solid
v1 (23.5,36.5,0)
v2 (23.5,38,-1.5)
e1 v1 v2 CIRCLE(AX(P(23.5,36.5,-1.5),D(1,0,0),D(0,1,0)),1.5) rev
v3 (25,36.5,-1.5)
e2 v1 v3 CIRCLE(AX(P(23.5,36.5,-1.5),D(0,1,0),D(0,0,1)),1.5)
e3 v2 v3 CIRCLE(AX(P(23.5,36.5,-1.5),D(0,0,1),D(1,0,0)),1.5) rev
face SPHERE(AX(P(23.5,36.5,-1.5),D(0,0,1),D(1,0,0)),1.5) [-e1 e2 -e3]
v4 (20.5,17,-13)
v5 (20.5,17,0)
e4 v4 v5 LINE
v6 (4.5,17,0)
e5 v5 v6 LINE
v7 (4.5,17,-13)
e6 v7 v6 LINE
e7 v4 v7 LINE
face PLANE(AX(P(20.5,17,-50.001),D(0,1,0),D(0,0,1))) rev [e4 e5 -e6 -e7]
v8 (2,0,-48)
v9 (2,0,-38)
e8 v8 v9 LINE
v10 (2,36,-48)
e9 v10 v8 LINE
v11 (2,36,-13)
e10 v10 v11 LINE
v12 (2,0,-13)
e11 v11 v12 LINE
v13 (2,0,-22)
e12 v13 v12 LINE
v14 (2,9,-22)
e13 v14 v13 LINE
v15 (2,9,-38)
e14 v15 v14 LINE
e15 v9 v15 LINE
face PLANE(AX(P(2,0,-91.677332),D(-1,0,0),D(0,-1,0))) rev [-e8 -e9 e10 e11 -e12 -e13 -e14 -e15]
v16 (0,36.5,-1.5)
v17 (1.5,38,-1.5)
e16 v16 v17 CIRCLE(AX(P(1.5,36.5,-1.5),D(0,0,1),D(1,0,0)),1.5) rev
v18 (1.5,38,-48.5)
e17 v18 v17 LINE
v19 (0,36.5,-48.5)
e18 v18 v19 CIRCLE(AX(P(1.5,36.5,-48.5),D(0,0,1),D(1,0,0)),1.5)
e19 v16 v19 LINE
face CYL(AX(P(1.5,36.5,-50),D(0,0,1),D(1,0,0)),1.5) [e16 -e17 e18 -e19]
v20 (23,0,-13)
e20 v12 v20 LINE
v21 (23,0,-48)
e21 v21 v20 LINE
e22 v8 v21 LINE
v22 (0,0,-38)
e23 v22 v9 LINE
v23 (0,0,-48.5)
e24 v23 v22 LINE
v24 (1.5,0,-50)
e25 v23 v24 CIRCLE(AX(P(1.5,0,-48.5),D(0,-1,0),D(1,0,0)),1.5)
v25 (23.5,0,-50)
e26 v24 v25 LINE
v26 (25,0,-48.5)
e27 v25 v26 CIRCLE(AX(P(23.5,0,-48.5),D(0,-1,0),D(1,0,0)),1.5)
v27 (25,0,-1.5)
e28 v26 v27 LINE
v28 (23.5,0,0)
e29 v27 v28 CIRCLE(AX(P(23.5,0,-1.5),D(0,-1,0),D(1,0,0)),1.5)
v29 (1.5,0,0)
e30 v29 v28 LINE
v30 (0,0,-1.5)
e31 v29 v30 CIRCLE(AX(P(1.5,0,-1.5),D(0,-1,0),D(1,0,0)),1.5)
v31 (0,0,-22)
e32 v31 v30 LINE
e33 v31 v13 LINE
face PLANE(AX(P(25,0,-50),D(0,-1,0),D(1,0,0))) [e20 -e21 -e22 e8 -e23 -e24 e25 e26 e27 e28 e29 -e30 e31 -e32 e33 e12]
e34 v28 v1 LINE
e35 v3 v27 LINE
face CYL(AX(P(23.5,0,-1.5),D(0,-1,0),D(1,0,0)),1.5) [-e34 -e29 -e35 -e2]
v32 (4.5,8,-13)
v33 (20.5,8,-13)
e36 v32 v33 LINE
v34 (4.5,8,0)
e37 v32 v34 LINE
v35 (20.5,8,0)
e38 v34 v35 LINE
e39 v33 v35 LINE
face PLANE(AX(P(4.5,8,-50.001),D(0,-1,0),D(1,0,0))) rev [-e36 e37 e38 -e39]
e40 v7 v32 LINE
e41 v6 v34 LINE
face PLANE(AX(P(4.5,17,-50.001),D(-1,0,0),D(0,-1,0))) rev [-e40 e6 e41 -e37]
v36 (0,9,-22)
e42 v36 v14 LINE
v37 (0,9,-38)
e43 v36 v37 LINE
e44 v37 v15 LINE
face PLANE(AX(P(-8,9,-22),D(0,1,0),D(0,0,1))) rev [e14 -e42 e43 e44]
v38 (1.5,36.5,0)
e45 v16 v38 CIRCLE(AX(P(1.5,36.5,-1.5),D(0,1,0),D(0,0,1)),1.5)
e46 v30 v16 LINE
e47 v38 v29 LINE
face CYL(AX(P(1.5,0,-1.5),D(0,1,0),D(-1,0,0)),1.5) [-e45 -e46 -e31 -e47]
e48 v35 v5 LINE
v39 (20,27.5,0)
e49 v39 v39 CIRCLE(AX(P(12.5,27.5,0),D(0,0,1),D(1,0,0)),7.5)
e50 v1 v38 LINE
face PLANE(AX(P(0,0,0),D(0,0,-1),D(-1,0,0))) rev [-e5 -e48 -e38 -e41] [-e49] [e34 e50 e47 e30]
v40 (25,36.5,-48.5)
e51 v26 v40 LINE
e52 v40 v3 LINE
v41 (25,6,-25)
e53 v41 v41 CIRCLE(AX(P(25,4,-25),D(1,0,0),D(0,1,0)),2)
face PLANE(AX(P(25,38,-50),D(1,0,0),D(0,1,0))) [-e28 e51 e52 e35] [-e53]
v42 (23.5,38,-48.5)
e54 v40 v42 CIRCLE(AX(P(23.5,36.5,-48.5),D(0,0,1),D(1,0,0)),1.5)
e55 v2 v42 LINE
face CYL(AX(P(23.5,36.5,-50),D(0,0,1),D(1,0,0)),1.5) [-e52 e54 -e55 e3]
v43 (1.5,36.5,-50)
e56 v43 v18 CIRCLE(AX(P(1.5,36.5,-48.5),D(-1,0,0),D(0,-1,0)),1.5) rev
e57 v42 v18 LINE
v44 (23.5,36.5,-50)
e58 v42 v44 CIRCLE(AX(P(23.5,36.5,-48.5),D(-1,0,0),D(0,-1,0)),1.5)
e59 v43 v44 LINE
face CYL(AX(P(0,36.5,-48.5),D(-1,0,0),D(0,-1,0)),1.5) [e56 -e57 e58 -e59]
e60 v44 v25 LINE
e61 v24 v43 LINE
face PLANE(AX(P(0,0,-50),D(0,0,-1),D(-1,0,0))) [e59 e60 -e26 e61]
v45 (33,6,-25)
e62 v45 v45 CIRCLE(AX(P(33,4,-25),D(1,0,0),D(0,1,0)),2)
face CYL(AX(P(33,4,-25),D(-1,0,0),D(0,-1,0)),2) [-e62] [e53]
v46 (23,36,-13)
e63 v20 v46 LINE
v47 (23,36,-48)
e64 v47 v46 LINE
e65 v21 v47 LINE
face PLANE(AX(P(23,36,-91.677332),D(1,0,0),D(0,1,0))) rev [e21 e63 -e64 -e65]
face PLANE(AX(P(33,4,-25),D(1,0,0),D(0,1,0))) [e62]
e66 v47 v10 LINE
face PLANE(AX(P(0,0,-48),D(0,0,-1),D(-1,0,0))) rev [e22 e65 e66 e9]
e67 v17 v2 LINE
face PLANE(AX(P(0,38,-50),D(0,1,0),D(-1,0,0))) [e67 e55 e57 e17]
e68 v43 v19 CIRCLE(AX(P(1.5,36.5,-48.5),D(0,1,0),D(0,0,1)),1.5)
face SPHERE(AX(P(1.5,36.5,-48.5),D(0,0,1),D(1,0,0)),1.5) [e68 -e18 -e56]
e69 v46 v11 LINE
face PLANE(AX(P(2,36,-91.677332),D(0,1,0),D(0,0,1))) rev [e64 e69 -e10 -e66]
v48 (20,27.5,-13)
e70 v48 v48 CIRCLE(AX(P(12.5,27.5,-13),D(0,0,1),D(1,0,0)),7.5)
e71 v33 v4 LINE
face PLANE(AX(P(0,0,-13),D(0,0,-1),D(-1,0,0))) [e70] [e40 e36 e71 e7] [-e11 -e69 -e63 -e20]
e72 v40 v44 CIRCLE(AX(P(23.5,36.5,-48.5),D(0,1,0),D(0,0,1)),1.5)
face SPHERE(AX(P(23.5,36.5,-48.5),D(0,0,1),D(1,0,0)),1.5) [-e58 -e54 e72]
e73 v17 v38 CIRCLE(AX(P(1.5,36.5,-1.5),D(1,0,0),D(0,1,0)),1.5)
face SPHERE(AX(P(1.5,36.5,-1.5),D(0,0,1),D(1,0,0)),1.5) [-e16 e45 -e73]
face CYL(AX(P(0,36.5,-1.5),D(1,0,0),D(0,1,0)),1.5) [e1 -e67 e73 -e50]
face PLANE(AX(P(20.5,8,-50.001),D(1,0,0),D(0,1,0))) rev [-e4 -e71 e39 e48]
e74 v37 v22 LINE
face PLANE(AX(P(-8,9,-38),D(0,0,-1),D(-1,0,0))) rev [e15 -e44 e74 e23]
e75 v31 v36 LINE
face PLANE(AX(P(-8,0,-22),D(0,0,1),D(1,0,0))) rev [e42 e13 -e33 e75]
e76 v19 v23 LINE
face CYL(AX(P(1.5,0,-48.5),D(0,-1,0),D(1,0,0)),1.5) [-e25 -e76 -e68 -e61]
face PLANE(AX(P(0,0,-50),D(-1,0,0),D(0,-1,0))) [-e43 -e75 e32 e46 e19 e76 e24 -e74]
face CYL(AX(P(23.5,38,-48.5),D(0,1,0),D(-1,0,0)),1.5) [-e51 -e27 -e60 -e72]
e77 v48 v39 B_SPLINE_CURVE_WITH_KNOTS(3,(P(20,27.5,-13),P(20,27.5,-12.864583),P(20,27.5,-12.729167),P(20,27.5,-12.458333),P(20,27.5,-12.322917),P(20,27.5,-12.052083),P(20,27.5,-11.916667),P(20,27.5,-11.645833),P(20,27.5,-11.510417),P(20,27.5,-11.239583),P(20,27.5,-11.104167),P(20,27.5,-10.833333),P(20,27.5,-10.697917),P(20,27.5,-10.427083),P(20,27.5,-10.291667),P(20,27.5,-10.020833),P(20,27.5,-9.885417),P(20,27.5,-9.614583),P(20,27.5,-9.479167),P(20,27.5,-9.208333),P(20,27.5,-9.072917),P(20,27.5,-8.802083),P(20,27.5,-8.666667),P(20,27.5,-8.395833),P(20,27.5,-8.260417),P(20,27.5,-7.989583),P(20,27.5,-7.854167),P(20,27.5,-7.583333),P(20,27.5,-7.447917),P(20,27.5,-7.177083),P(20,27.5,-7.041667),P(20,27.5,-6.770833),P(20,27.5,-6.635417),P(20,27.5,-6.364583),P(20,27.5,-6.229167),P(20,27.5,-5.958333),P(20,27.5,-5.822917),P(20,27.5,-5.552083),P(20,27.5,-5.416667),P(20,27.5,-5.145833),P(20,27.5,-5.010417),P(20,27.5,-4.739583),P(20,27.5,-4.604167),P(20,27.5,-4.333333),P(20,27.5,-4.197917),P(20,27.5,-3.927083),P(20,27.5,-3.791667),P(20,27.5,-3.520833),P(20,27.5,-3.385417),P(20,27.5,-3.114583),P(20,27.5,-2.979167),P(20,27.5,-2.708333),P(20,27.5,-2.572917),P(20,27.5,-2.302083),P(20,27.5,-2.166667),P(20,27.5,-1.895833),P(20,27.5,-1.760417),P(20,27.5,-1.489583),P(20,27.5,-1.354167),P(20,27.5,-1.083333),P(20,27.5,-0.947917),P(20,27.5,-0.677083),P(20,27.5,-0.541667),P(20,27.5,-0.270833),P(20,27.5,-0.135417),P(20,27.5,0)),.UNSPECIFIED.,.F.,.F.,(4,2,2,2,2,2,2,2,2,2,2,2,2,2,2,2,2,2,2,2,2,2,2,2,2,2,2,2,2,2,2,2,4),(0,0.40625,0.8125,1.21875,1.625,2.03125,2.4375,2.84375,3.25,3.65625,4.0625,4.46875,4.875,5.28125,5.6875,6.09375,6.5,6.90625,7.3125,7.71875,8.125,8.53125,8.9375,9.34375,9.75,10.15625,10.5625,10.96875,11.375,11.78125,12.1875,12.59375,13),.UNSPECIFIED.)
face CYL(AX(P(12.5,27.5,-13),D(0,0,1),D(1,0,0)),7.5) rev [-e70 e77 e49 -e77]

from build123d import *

# Parameters (mm, degrees)
SKETCH_1_W          = 25
SKETCH_1_H          = 38
EXTRUDE_1_DEPTH     = 50
SKETCH_2_R          = 7.5
CUT_EXTRUDE_1_DEPTH = 13
SKETCH_3_W          = 21
SKETCH_3_H          = 36
CUT_EXTRUDE_2_DEPTH = 35
SKETCH_4_W          = 16
SKETCH_4_H          = 9
CUT_EXTRUDE_3_DEPTH = 10
FILLET_1_R          = 1.5
FILLET_2_R          = 1.5
FILLET_3_R          = 1.5
SKETCH_5_R          = 2
EXTRUDE_2_DEPTH     = 8
CUT_EXTRUDE_4_REACH = 72.944
SKETCH_6_W          = 16
SKETCH_6_H          = 9


with BuildPart() as part:
    # 草图1 → 凸台-拉伸1 (new body)
    with BuildSketch(Plane.XY):
        with Locations((12.5, 19)):
            Rectangle(SKETCH_1_W, SKETCH_1_H)
    extrude(amount=-EXTRUDE_1_DEPTH)

    # 草图2 → 切除-拉伸1 (cut)
    with BuildSketch(Plane.XY):
        with Locations((12.5, 27.5)):
            Circle(SKETCH_2_R)
    extrude(amount=-CUT_EXTRUDE_1_DEPTH, mode=Mode.SUBTRACT)

    # 草图3 → 切除-拉伸2 (cut)
    with BuildSketch(Plane.XY.offset(-13)):
        with Locations((12.5, 18)):
            Rectangle(SKETCH_3_W, SKETCH_3_H)
    extrude(amount=-CUT_EXTRUDE_2_DEPTH, mode=Mode.SUBTRACT)

    # 草图4 → 切除-拉伸3 (cut)
    with BuildSketch(Plane(origin=(2, 0, 0), x_dir=(0, 0, -1), z_dir=(1, 0, 0))):
        with Locations((30, 4.5)):
            Rectangle(SKETCH_4_W, SKETCH_4_H)
    extrude(amount=-CUT_EXTRUDE_3_DEPTH, mode=Mode.SUBTRACT)

    # 圆角1
    fillet_1_edges = [part.edges().sort_by_distance(p)[0] for p in [
        (12.5, 38, -50),
        (12.5, 38, 0),
        (0, 38, -25),
        (25, 38, -25),
    ]]
    fillet(fillet_1_edges, radius=FILLET_1_R)

    # 圆角2
    # the kernel refuses this fillet: 1.5 mm, written as the material it takes off along each edge
    with BuildSketch(Plane(origin=(1.5, 36.5, -48.5), x_dir=(0, 0, -1), z_dir=(-1, 0, 0))) as fillet_2_piece_1_section:
        Polygon((0, 0), (FILLET_2_R, 0), (FILLET_2_R, -FILLET_2_R), (0, -FILLET_2_R), align=None)
    fillet_2_piece_1 = extrude(amount=FILLET_2_R, mode=Mode.PRIVATE)
    fillet_2_piece_1 = fillet_2_piece_1 - Plane(origin=(1.5, 36.5, -48.5), x_dir=(0, -0.7071067811865475, 0.7071067811865475), z_dir=(-1, 0, 0)) * Sphere(FILLET_2_R, mode=Mode.PRIVATE)
    add(fillet_2_piece_1, mode=Mode.SUBTRACT)
    with BuildSketch(Plane(origin=(1.5, 36.5, -1.5), x_dir=(0, 0, 1), z_dir=(-1, 0, 0))) as fillet_2_piece_2_section:
        Polygon((0, 0), (FILLET_2_R, 0), (FILLET_2_R, FILLET_2_R), (0, FILLET_2_R), align=None)
    fillet_2_piece_2 = extrude(amount=FILLET_2_R, mode=Mode.PRIVATE)
    fillet_2_piece_2 = fillet_2_piece_2 - Plane(origin=(1.5, 36.5, -1.5), x_dir=(0, -0.7071067811865475, -0.7071067811865475), z_dir=(-1, 0, 0)) * Sphere(FILLET_2_R, mode=Mode.PRIVATE)
    add(fillet_2_piece_2, mode=Mode.SUBTRACT)
    with BuildSketch(Plane(origin=(23.5, 36.5, -48.5), x_dir=(1, 0, 0), z_dir=(0, 0, -1))) as fillet_2_piece_3_section:
        Polygon((0, 0), (FILLET_2_R, 0), (FILLET_2_R, -FILLET_2_R), (0, -FILLET_2_R), align=None)
    fillet_2_piece_3 = extrude(amount=FILLET_2_R, mode=Mode.PRIVATE)
    fillet_2_piece_3 = fillet_2_piece_3 - Plane(origin=(23.5, 36.5, -48.5), x_dir=(-0.7071067811865476, -0.7071067811865476, 0), z_dir=(0, 0, -1)) * Sphere(FILLET_2_R, mode=Mode.PRIVATE)
    add(fillet_2_piece_3, mode=Mode.SUBTRACT)
    with BuildSketch(Plane(origin=(0, -3.75, -50), x_dir=(0, 0, 1), z_dir=(0, 1, 0))) as fillet_2_piece_4:
        with BuildLine():
            CenterArc((FILLET_2_R, FILLET_2_R), FILLET_2_R, 180, 90)
            Line((0, FILLET_2_R), (0, 0))
            Line((0, 0), (FILLET_2_R, 0))
        make_face()
    extrude(amount=40.25, mode=Mode.SUBTRACT)
    with BuildSketch(Plane(origin=(0, -3.75, 0), x_dir=(0, 0, -1), z_dir=(0, 1, 0)), Plane(origin=(25, 36.5, -50), x_dir=(-1, 0, 0), z_dir=(0, -1, 0))) as fillet_2_piece_5:
        with BuildLine():
            CenterArc((FILLET_2_R, -FILLET_2_R), FILLET_2_R, 90, 90)
            Line((0, -FILLET_2_R), (0, 0))
            Line((0, 0), (FILLET_2_R, 0))
        make_face()
    extrude(amount=40.25, mode=Mode.SUBTRACT)

    # 圆角3
    # the kernel refuses this fillet: 1.5 mm, written as the material it takes off along each edge
    with BuildSketch(Plane(origin=(23.5, 36.5, -1.5), x_dir=(1, 0, 0), z_dir=(0, 0, 1))) as fillet_3_piece_1_section:
        Polygon((0, 0), (FILLET_3_R, 0), (FILLET_3_R, FILLET_3_R), (0, FILLET_3_R), align=None)
    fillet_3_piece_1 = extrude(amount=FILLET_3_R, mode=Mode.PRIVATE)
    fillet_3_piece_1 = fillet_3_piece_1 - Plane(origin=(23.5, 36.5, -1.5), x_dir=(-0.7071067811865476, -0.7071067811865476, 0), z_dir=(0, 0, 1)) * Sphere(FILLET_3_R, mode=Mode.PRIVATE)
    add(fillet_3_piece_1, mode=Mode.SUBTRACT)
    with BuildSketch(Plane(origin=(25, 36.5, 0), x_dir=(-1, 0, 0), z_dir=(0, -1, 0))) as fillet_3_piece_2:
        with BuildLine():
            CenterArc((FILLET_3_R, FILLET_3_R), FILLET_3_R, 180, 90)
            Line((0, FILLET_3_R), (0, 0))
            Line((0, 0), (FILLET_3_R, 0))
        make_face()
    extrude(amount=40.25, mode=Mode.SUBTRACT)

    # 草图5 → 凸台-拉伸2 (add)
    with BuildSketch(Plane(origin=(25, 0, 0), x_dir=(0, 0, -1), z_dir=(1, 0, 0))):
        with Locations(Location((25, 4, 0), (0, 0, 90))):
            Circle(SKETCH_5_R)
    extrude(amount=EXTRUDE_2_DEPTH)

    # 草图6 → 切除-拉伸4 (cut, up to next)
    with BuildSketch(Plane.XY, mode=Mode.PRIVATE) as cut_extrude_4_sk1:
        with Locations((12.5, 12.5)):
            Rectangle(SKETCH_6_W, SKETCH_6_H)
    cut_extrude_4_tool1 = extrude(cut_extrude_4_sk1.sketch, amount=-CUT_EXTRUDE_4_REACH, mode=Mode.PRIVATE) & part.part
    add(cut_extrude_4_tool1.solids().sort_by_distance((12.5, 12.5, 0))[0], mode=Mode.SUBTRACT)


solid = part.part
